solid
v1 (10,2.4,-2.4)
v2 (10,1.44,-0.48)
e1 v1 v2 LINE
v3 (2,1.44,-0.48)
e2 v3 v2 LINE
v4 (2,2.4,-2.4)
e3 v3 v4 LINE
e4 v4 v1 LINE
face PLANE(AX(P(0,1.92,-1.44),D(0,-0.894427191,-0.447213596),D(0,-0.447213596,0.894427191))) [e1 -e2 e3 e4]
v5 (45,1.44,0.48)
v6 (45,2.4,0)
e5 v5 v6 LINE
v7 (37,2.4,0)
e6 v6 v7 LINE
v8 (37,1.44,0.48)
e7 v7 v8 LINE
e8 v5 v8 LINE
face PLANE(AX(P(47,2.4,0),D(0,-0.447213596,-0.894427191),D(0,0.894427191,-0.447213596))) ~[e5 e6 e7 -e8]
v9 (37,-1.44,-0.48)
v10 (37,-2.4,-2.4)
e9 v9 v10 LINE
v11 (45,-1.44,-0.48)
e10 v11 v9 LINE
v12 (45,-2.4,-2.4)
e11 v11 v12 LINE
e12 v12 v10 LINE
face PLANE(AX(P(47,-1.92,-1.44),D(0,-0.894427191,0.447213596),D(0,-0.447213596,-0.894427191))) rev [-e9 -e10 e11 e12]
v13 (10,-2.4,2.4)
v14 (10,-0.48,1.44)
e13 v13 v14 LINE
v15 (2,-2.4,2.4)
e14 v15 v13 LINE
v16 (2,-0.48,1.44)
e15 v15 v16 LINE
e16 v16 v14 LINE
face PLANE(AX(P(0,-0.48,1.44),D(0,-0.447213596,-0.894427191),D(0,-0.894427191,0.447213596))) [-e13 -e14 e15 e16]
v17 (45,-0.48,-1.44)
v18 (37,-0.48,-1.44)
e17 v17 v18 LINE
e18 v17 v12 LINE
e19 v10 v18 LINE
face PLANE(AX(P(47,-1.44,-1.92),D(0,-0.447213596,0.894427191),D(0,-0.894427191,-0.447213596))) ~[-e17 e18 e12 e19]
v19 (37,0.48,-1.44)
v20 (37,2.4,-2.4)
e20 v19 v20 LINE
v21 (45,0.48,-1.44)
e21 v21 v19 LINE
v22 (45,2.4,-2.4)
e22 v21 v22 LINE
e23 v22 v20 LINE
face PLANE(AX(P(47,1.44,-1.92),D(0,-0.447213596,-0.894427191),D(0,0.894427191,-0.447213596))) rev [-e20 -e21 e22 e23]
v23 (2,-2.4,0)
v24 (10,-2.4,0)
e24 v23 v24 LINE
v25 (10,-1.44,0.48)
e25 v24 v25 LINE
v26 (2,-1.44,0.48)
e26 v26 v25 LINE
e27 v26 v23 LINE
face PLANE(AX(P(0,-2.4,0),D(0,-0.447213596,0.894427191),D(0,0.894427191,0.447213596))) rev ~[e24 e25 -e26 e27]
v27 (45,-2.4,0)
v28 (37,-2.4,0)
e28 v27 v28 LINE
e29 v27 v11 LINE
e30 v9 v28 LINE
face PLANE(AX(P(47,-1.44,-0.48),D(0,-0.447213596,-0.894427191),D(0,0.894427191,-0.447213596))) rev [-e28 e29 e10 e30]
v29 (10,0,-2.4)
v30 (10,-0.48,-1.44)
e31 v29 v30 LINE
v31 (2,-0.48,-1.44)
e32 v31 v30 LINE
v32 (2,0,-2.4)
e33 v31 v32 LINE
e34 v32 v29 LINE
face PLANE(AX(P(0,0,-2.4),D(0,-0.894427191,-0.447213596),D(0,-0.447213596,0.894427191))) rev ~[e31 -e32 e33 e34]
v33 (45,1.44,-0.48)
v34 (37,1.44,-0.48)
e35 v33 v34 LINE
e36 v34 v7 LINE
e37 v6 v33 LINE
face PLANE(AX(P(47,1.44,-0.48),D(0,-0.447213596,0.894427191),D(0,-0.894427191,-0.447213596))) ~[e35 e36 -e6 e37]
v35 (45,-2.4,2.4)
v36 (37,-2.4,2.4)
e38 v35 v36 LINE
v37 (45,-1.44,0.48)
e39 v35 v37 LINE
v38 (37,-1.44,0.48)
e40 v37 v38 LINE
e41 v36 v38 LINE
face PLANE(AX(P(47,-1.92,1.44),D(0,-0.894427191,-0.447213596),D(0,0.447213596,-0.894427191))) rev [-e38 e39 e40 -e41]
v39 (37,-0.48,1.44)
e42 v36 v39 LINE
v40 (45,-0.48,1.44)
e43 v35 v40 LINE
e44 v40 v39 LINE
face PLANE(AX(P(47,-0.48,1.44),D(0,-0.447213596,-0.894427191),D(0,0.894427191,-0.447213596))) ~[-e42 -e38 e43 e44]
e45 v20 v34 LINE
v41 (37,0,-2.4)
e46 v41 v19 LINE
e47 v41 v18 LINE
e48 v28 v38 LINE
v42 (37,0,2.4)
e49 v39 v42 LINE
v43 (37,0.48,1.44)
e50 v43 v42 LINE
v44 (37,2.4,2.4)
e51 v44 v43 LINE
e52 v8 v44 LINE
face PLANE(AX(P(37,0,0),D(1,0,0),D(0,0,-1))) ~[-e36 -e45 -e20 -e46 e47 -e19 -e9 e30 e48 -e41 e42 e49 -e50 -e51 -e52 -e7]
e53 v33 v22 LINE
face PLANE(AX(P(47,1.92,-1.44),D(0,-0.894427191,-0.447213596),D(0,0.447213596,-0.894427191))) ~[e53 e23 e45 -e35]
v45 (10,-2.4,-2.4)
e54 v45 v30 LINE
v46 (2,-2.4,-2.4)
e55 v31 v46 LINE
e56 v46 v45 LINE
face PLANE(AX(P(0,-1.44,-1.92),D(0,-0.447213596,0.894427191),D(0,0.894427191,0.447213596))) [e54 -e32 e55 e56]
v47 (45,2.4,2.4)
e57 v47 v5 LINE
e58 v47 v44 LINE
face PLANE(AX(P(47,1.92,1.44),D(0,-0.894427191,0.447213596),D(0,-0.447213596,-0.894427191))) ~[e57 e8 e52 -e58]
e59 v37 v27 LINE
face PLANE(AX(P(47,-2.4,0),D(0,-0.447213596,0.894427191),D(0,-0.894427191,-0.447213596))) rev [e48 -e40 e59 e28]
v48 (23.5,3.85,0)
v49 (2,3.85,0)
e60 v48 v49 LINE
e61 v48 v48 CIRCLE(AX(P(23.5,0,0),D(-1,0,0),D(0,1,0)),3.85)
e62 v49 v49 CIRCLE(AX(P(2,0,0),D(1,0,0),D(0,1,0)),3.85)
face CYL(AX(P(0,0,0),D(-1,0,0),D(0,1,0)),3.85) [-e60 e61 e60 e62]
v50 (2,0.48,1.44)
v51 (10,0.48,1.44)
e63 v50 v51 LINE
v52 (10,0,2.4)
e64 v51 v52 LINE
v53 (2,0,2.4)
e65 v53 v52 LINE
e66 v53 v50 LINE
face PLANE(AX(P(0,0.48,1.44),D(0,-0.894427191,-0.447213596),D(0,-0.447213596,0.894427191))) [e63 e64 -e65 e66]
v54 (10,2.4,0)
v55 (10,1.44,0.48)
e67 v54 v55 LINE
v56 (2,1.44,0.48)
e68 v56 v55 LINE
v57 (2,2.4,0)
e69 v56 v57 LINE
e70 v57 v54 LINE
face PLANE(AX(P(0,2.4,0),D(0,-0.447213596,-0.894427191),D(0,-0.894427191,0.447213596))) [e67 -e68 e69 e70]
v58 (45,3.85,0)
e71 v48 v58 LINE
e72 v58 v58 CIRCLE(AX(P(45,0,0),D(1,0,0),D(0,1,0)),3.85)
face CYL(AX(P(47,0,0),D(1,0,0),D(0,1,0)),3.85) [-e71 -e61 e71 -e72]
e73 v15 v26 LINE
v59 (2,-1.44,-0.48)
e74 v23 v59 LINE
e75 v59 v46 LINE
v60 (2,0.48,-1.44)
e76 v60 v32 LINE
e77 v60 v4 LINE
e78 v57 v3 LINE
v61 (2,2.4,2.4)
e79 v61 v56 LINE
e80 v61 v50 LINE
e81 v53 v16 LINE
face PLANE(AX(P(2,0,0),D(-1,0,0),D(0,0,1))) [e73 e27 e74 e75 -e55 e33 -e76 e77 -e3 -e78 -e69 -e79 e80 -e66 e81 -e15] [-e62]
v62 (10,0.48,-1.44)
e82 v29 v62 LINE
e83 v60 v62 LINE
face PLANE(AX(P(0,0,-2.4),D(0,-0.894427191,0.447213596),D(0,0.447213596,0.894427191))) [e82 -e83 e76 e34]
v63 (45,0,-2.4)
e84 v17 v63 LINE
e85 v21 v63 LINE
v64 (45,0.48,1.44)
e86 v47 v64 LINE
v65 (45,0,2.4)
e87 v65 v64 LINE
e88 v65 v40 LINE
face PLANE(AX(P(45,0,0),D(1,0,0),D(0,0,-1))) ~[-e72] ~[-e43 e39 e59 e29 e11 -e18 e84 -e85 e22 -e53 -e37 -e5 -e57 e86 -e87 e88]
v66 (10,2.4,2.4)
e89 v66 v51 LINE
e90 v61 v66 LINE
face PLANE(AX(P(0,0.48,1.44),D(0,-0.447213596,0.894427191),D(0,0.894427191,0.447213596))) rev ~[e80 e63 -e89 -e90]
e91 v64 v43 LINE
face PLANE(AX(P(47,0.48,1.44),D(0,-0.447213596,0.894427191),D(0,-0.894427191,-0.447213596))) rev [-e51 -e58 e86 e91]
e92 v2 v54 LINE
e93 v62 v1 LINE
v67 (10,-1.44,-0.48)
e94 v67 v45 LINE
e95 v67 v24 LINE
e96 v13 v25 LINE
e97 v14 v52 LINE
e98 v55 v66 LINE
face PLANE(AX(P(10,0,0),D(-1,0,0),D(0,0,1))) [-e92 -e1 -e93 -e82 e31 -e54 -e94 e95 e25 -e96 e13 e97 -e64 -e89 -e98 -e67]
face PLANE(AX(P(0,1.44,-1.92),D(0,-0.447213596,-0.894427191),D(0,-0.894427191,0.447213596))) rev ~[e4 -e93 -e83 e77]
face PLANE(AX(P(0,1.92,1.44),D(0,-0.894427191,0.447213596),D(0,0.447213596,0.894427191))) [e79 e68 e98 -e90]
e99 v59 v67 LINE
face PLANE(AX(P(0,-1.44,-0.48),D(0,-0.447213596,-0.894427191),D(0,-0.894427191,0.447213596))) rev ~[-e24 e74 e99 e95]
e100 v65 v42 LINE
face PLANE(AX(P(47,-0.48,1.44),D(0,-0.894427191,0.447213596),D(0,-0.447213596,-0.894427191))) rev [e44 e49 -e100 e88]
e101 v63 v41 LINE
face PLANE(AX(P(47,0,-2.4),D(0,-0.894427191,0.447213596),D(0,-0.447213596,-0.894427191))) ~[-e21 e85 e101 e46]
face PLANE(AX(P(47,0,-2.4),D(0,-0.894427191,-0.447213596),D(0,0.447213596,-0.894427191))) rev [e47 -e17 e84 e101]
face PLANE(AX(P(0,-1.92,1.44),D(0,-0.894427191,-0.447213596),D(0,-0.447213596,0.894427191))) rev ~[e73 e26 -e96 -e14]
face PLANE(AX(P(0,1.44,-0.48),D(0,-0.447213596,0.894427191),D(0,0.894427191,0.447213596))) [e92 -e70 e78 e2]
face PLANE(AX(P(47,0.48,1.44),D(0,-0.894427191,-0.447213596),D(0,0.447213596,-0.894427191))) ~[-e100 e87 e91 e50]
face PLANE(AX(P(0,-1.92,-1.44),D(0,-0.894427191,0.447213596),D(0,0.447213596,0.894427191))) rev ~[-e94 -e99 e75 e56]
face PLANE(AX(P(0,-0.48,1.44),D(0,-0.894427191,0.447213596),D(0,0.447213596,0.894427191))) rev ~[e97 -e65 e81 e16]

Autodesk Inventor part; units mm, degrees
ref_plane "YZ Plane" through (0, 0, 0) normal (1, 0, 0) x (0, 1, 0)
ref_plane "XZ Plane" through (0, 0, 0) normal (0, 1, 0) x (-1, 0, 0)
ref_plane "XY Plane" through (0, 0, 0) normal (0, 0, 1) x (1, 0, 0)
sketch "Sketch1" plane through (0, 0, 0) normal (1, 0, 0) x (0, 1, 0)
  circle A0 centre (0, 0) radius 3.85
  dimension "d0" = 7.7
extrude "Extrusion1" add sketch "Sketch1" along normal blind 5
sketch "Sketch2" plane through (5, 0, 0) normal (1, 0, 0) x (0, 0, -1)
  circle A0 centre (0, 0) radius 3.85
  dimension "d3" = 7.7
extrude "Extrusion2" add sketch "Sketch2" along normal blind 18.5
sketch "Sketch5" plane through (0, 0, 0) normal (-1, 0, 0) x (0, 0, 1)
  circle A0 centre (0, 0) radius 2.4
  line L0 (0, 0) -> (-2.4, 0)
  line L1 (-2.4, 0) -> (-2.4, 2.4)
  line L2 (-2.4, 2.4) -> (0, 2.4)
  line L3 (0, 2.4) -> (0, 0)
  line L4 (-2.4, 2.4) -> (2.4, 2.4)
  line L5 (2.4, 2.4) -> (2.4, -2.4)
  line L6 (2.4, -2.4) -> (-2.4, -2.4)
  line L7 (-2.4, -2.4) -> (-2.4, 2.4)
  line L8 (-2.4, 2.4) -> (2.4, 0)
  line L9 (-2.4, -2.4) -> (2.4, 0)
  line L10 (-2.4, 0) -> (2.4, 2.4)
  line L11 (-2.4, 0) -> (2.4, -2.4)
  line L12 (0, 2.4) -> (2.4, -2.4)
  line L13 (-2.4, -2.4) -> (0, 2.4)
  line L14 (-2.4, 2.4) -> (0, -2.4)
  line L15 (0, -2.4) -> (2.4, 2.4)
  point P0 (1.44, -0.48)
  point P1 (1.44, 0.48)
  point P2 (0.48, 1.44)
  point P3 (-0.48, 1.44)
  point P4 (-1.44, 0.48)
  point P5 (-1.44, -0.48)
  point P6 (-0.48, -1.44)
  point P7 (0.48, -1.44)
  dimension "d23" = 4.8
extrude "Extrusion5" cut sketch "Sketch5" against normal blind 10 contours L9 L12 L15 L8 | L15 L8 L12 L10 A0 | A0 L10 L15 | L12 L11 A0 | A0 L11 L15 L9 L12 | L15 L12 L8 | L9 L15 L12 | L12 L10 L3 | L3 L8 L13 | L14 L9 L11 L15 | L12 L15 L9 L11 L14 L0 L3 L8 | L8 L10 L12 | L15 L11 L9 | L8 L13 L10 L14 A0 | A0 L14 L8 | L10 L13 L8 | L3 L0 L13 L10 | L9 L13 A0 | A0 L13 L11 L14 L9 | L14 L11 L9 | L10 L14 L0 | L0 L13 L11 | L13 L14 L10 | L11 L13 L14
sketch "Sketch7" plane through (0, 0, 0) normal (-1, 0, 0) x (0, 0, 1)
  circle A0 centre (0, 0) radius 3.85
extrude "Extrusion7" cut sketch "Sketch7" against normal blind 2
mirror "Mirror1" about plane through (23.5, 0, 0) normal (1, 0, 0)
properties part number "gear_shaft"
